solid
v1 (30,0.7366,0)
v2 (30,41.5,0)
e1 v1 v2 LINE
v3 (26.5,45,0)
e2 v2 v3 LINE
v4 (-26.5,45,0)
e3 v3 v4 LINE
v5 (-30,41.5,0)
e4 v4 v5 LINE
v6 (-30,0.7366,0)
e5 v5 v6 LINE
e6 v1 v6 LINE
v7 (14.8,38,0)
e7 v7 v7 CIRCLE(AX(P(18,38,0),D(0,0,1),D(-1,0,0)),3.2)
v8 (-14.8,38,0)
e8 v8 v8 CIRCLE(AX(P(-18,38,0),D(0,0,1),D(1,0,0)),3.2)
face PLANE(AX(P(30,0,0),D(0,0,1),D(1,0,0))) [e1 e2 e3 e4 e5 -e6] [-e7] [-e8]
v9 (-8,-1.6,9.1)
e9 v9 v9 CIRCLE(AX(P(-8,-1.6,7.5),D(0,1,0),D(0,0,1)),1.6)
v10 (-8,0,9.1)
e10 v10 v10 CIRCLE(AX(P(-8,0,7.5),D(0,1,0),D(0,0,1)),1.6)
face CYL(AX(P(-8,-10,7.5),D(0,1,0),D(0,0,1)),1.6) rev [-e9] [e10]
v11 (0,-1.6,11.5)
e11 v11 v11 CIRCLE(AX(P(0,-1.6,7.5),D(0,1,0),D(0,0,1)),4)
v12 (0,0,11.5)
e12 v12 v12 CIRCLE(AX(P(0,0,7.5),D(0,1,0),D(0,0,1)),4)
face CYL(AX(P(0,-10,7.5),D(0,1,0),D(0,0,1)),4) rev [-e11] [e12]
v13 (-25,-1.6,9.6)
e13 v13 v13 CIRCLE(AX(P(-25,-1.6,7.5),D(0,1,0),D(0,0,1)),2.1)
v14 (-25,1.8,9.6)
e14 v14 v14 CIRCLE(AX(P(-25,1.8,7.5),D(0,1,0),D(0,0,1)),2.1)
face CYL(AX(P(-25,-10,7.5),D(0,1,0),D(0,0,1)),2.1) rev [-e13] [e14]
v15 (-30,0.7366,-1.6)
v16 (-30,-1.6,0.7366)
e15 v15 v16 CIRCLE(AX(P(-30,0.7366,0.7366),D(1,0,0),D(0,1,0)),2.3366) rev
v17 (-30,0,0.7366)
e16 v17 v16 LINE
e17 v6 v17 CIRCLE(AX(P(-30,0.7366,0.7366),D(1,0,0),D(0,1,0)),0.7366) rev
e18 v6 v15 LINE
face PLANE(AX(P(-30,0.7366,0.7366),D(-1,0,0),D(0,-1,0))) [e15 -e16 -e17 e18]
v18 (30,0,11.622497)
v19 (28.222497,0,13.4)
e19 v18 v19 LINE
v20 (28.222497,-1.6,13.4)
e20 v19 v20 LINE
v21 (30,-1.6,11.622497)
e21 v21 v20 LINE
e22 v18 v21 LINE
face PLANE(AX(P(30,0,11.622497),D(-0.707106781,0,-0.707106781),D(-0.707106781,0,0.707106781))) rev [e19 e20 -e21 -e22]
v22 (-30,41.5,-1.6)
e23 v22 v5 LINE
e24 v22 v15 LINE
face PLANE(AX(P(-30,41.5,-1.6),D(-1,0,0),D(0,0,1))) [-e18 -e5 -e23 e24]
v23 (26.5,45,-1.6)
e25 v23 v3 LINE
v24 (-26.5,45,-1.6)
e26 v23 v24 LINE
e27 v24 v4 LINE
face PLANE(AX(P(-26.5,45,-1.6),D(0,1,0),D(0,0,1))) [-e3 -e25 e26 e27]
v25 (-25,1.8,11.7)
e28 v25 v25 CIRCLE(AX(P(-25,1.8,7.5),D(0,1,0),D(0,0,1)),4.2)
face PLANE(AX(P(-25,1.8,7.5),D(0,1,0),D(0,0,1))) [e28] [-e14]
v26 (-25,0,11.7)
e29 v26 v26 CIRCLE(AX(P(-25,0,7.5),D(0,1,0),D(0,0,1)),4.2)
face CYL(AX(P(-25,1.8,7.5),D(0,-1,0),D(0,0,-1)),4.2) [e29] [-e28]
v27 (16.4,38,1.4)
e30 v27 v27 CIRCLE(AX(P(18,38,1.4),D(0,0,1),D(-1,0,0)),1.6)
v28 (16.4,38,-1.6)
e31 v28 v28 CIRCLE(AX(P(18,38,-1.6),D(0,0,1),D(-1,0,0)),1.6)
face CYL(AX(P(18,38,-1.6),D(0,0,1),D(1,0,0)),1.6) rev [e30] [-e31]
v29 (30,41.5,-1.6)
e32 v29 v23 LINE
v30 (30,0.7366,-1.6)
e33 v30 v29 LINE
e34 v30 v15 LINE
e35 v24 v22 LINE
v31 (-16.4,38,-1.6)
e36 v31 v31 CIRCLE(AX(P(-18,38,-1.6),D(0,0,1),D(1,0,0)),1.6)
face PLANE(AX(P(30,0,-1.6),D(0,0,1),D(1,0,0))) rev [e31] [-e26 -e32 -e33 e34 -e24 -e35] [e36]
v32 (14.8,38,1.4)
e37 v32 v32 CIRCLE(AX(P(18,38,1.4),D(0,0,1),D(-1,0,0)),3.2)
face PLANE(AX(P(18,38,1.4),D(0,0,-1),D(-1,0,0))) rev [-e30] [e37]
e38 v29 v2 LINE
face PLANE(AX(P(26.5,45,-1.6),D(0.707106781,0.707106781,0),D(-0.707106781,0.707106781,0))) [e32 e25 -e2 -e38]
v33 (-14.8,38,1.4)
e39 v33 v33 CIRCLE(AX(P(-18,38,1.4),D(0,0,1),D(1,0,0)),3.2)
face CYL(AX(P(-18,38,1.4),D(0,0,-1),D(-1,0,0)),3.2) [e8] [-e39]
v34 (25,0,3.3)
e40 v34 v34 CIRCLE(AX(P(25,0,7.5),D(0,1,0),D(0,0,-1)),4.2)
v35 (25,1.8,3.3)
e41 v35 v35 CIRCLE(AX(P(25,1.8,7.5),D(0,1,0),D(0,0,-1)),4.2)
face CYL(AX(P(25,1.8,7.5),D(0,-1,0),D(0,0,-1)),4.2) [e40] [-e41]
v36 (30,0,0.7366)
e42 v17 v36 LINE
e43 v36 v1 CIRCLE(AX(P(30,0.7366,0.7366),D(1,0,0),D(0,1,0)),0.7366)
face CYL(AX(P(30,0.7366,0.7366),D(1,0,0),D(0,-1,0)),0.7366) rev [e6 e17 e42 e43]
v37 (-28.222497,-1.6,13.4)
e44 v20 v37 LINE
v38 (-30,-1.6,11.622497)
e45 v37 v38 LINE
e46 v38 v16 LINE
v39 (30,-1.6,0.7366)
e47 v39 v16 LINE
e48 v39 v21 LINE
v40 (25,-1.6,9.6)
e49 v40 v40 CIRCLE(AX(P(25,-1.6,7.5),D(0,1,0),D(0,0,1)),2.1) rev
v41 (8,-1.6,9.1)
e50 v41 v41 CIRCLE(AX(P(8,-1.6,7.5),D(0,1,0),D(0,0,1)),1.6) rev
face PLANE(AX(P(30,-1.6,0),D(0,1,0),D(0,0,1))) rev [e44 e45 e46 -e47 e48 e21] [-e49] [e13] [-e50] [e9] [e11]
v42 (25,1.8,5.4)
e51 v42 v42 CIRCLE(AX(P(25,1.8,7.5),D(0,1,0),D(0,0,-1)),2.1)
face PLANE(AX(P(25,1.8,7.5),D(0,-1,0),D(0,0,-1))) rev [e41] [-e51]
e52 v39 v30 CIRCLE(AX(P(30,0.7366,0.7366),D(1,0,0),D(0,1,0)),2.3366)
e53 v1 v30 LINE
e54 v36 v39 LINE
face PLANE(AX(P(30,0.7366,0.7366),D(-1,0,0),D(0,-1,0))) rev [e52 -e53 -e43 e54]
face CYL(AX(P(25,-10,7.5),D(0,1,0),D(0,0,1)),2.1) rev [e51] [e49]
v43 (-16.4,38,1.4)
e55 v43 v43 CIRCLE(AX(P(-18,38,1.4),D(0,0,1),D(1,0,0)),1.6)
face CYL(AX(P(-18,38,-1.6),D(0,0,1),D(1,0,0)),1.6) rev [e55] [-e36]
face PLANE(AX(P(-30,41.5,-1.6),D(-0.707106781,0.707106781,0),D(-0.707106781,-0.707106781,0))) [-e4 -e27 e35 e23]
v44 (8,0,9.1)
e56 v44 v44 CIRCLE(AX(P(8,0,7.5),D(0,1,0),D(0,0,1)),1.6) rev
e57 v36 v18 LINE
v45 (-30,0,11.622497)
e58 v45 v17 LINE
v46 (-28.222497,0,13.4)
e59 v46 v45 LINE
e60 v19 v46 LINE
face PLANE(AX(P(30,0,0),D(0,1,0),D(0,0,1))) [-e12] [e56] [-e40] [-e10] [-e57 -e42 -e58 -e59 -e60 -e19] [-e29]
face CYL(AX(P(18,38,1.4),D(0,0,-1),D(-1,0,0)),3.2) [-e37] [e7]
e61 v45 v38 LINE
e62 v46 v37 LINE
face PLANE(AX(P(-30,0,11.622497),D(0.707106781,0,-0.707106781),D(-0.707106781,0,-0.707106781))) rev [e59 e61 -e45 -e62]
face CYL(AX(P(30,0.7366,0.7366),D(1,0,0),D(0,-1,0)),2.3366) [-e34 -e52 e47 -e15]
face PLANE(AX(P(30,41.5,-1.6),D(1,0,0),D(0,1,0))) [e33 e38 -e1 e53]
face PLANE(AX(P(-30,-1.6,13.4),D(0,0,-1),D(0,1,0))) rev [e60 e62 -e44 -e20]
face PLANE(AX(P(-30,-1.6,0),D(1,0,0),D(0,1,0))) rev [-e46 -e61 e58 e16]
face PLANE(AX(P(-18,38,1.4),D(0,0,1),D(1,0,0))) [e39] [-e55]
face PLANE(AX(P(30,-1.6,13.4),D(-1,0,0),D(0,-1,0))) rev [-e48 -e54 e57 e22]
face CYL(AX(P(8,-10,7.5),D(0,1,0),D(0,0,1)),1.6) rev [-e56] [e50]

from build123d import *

# Parameters (mm, degrees)
SM_BASE_FLANGE_1_DEPTH           = 1.6
SM_EDGE_FLANGE_1_STRIP_W         = 7.8732
SM_EDGE_FLANGE_1_STRIP_H         = 1.6
SM_EDGE_FLANGE_1_STRIP_CUT_DEPTH = 60
SM_EDGE_FLANGE_1_DEPTH           = 60
CUT_EXTRUDE_1_DEPTH              = 56.718578589
SKETCH_9_R                       = 2.1
SKETCH_9_R_2                     = 1.6
SKETCH_9_R_3                     = 4
CUT_EXTRUDE_3_DEPTH              = 10
EXTRUDE_START                    = 1.8
SKETCH_10_R                      = 4.2
SKETCH_10_R_2                    = 2.1
EXTRUDE_2_DEPTH                  = 1.8
SKETCH_11_R                      = 3.2
EXTRUDE_3_DEPTH                  = 1.4
SKETCH_12_R                      = 1.6
CUT_EXTRUDE_4_DEPTH              = 56.398555938


# Sheet-metal steps are written as plain solids
with BuildPart() as part:
    # Sketch 1 → 基体-法兰1 (new body)
    with BuildSketch(Plane.XY):
        Polygon((-26.5, 45), (26.5, 45), (30, 41.5), (30, 0), (-30, 0), (-30, 41.5), align=None)
    extrude(amount=-SM_BASE_FLANGE_1_DEPTH)

    # 边线-法兰1 strip (across the edge) → 边线-法兰1 strip cut (cut)
    with BuildSketch(Plane.YZ.offset(-30)):
        with Locations((-3.2, -0.8)):
            Rectangle(SM_EDGE_FLANGE_1_STRIP_W, SM_EDGE_FLANGE_1_STRIP_H)
    extrude(amount=SM_EDGE_FLANGE_1_STRIP_CUT_DEPTH, mode=Mode.SUBTRACT)

    # 边线-法兰1 section (across the edge) → 边线-法兰1 (add)
    with BuildSketch(Plane.YZ.offset(-30)):
        with BuildLine():
            Line((-1.6, 0.7366), (-1.6, 13.4))
            Line((-1.6, 13.4), (0, 13.4))
            Line((0, 13.4), (0, 0.7366))
            ThreePointArc((0, 0.7366), (0.215745145, 0.215745145), (0.7366, 0))
            Line((0.7366, 0), (0.7366, -1.6))
            ThreePointArc((0.7366, -1.6), (-0.915625705, -0.915625705), (-1.6, 0.7366))
        make_face()
    extrude(amount=SM_EDGE_FLANGE_1_DEPTH)

    # 草图8 → 切除-拉伸1 (cut, through all)
    with BuildSketch(Plane(origin=(0, 0, 0), x_dir=(1, 0, 0), z_dir=(0, 1, 0))):
        Polygon((-30, -11.622497289), (-28.222497289, -13.4), (-30, -13.4), align=None)
        Polygon((28.222497289, -13.4), (30, -13.4), (30, -11.622497289), align=None)
    extrude(amount=-CUT_EXTRUDE_1_DEPTH, mode=Mode.SUBTRACT)

    # 草图9 → 切除-拉伸3 (cut)
    with BuildSketch(Plane(origin=(0, 0, 0), x_dir=(1, 0, 0), z_dir=(0, 1, 0))):
        with Locations(Location((-25, -7.5, 0), (0, 0, 270))):
            Circle(SKETCH_9_R)
        with Locations(Location((-8, -7.5, 0), (0, 0, 270))):
            Circle(SKETCH_9_R_2)
        with Locations(Location((0, -7.5, 0), (0, 0, 270))):
            Circle(SKETCH_9_R_3)
        with Locations(Location((25, -7.5, 0), (0, 0, 270))):
            Circle(SKETCH_9_R)
        with Locations(Location((8, -7.5, 0), (0, 0, 270))):
            Circle(SKETCH_9_R_2)
    extrude(amount=-CUT_EXTRUDE_3_DEPTH, mode=Mode.SUBTRACT)

    # 草图10 → 凸台-拉伸2 (add)
    # profile 1 of 2: a face of its own
    with BuildSketch(Plane(origin=(0, 0, 0), x_dir=(1, 0, 0), z_dir=(0, 1, 0)).offset(EXTRUDE_START)):
        with Locations(Location((-25, -7.5, 0), (0, 0, 270))):
            Circle(SKETCH_10_R)
        with Locations(Location((-25, -7.5, 0), (0, 0, 270))):
            Circle(SKETCH_10_R_2, mode=Mode.SUBTRACT)
    # profile 2 of 2: a face of its own
    with BuildSketch(Plane(origin=(0, 0, 0), x_dir=(1, 0, 0), z_dir=(0, 1, 0)).offset(EXTRUDE_START)):
        with Locations(Location((25, -7.5, 0), (0, 0, 90))):
            Circle(SKETCH_10_R)
        with Locations(Location((25, -7.5, 0), (0, 0, 270))):
            Circle(SKETCH_10_R_2, mode=Mode.SUBTRACT)
    extrude(amount=-EXTRUDE_2_DEPTH)

    # 草图11 → 凸台-拉伸3 (add)
    with BuildSketch(Plane.XY):
        with Locations((-18, 38)):
            Circle(SKETCH_11_R)
        with Locations(Location((18, 38, 0), (0, 0, 180))):
            Circle(SKETCH_11_R)
    extrude(amount=EXTRUDE_3_DEPTH)

    # 草图12 → 切除-拉伸4 (cut, through all)
    with BuildSketch(Plane.XY.offset(1.4)):
        with Locations((-18, 38)):
            Circle(SKETCH_12_R)
        with Locations(Location((18, 38, 0), (0, 0, 180))):
            Circle(SKETCH_12_R)
    extrude(amount=-CUT_EXTRUDE_4_DEPTH, mode=Mode.SUBTRACT)


solid = part.part
